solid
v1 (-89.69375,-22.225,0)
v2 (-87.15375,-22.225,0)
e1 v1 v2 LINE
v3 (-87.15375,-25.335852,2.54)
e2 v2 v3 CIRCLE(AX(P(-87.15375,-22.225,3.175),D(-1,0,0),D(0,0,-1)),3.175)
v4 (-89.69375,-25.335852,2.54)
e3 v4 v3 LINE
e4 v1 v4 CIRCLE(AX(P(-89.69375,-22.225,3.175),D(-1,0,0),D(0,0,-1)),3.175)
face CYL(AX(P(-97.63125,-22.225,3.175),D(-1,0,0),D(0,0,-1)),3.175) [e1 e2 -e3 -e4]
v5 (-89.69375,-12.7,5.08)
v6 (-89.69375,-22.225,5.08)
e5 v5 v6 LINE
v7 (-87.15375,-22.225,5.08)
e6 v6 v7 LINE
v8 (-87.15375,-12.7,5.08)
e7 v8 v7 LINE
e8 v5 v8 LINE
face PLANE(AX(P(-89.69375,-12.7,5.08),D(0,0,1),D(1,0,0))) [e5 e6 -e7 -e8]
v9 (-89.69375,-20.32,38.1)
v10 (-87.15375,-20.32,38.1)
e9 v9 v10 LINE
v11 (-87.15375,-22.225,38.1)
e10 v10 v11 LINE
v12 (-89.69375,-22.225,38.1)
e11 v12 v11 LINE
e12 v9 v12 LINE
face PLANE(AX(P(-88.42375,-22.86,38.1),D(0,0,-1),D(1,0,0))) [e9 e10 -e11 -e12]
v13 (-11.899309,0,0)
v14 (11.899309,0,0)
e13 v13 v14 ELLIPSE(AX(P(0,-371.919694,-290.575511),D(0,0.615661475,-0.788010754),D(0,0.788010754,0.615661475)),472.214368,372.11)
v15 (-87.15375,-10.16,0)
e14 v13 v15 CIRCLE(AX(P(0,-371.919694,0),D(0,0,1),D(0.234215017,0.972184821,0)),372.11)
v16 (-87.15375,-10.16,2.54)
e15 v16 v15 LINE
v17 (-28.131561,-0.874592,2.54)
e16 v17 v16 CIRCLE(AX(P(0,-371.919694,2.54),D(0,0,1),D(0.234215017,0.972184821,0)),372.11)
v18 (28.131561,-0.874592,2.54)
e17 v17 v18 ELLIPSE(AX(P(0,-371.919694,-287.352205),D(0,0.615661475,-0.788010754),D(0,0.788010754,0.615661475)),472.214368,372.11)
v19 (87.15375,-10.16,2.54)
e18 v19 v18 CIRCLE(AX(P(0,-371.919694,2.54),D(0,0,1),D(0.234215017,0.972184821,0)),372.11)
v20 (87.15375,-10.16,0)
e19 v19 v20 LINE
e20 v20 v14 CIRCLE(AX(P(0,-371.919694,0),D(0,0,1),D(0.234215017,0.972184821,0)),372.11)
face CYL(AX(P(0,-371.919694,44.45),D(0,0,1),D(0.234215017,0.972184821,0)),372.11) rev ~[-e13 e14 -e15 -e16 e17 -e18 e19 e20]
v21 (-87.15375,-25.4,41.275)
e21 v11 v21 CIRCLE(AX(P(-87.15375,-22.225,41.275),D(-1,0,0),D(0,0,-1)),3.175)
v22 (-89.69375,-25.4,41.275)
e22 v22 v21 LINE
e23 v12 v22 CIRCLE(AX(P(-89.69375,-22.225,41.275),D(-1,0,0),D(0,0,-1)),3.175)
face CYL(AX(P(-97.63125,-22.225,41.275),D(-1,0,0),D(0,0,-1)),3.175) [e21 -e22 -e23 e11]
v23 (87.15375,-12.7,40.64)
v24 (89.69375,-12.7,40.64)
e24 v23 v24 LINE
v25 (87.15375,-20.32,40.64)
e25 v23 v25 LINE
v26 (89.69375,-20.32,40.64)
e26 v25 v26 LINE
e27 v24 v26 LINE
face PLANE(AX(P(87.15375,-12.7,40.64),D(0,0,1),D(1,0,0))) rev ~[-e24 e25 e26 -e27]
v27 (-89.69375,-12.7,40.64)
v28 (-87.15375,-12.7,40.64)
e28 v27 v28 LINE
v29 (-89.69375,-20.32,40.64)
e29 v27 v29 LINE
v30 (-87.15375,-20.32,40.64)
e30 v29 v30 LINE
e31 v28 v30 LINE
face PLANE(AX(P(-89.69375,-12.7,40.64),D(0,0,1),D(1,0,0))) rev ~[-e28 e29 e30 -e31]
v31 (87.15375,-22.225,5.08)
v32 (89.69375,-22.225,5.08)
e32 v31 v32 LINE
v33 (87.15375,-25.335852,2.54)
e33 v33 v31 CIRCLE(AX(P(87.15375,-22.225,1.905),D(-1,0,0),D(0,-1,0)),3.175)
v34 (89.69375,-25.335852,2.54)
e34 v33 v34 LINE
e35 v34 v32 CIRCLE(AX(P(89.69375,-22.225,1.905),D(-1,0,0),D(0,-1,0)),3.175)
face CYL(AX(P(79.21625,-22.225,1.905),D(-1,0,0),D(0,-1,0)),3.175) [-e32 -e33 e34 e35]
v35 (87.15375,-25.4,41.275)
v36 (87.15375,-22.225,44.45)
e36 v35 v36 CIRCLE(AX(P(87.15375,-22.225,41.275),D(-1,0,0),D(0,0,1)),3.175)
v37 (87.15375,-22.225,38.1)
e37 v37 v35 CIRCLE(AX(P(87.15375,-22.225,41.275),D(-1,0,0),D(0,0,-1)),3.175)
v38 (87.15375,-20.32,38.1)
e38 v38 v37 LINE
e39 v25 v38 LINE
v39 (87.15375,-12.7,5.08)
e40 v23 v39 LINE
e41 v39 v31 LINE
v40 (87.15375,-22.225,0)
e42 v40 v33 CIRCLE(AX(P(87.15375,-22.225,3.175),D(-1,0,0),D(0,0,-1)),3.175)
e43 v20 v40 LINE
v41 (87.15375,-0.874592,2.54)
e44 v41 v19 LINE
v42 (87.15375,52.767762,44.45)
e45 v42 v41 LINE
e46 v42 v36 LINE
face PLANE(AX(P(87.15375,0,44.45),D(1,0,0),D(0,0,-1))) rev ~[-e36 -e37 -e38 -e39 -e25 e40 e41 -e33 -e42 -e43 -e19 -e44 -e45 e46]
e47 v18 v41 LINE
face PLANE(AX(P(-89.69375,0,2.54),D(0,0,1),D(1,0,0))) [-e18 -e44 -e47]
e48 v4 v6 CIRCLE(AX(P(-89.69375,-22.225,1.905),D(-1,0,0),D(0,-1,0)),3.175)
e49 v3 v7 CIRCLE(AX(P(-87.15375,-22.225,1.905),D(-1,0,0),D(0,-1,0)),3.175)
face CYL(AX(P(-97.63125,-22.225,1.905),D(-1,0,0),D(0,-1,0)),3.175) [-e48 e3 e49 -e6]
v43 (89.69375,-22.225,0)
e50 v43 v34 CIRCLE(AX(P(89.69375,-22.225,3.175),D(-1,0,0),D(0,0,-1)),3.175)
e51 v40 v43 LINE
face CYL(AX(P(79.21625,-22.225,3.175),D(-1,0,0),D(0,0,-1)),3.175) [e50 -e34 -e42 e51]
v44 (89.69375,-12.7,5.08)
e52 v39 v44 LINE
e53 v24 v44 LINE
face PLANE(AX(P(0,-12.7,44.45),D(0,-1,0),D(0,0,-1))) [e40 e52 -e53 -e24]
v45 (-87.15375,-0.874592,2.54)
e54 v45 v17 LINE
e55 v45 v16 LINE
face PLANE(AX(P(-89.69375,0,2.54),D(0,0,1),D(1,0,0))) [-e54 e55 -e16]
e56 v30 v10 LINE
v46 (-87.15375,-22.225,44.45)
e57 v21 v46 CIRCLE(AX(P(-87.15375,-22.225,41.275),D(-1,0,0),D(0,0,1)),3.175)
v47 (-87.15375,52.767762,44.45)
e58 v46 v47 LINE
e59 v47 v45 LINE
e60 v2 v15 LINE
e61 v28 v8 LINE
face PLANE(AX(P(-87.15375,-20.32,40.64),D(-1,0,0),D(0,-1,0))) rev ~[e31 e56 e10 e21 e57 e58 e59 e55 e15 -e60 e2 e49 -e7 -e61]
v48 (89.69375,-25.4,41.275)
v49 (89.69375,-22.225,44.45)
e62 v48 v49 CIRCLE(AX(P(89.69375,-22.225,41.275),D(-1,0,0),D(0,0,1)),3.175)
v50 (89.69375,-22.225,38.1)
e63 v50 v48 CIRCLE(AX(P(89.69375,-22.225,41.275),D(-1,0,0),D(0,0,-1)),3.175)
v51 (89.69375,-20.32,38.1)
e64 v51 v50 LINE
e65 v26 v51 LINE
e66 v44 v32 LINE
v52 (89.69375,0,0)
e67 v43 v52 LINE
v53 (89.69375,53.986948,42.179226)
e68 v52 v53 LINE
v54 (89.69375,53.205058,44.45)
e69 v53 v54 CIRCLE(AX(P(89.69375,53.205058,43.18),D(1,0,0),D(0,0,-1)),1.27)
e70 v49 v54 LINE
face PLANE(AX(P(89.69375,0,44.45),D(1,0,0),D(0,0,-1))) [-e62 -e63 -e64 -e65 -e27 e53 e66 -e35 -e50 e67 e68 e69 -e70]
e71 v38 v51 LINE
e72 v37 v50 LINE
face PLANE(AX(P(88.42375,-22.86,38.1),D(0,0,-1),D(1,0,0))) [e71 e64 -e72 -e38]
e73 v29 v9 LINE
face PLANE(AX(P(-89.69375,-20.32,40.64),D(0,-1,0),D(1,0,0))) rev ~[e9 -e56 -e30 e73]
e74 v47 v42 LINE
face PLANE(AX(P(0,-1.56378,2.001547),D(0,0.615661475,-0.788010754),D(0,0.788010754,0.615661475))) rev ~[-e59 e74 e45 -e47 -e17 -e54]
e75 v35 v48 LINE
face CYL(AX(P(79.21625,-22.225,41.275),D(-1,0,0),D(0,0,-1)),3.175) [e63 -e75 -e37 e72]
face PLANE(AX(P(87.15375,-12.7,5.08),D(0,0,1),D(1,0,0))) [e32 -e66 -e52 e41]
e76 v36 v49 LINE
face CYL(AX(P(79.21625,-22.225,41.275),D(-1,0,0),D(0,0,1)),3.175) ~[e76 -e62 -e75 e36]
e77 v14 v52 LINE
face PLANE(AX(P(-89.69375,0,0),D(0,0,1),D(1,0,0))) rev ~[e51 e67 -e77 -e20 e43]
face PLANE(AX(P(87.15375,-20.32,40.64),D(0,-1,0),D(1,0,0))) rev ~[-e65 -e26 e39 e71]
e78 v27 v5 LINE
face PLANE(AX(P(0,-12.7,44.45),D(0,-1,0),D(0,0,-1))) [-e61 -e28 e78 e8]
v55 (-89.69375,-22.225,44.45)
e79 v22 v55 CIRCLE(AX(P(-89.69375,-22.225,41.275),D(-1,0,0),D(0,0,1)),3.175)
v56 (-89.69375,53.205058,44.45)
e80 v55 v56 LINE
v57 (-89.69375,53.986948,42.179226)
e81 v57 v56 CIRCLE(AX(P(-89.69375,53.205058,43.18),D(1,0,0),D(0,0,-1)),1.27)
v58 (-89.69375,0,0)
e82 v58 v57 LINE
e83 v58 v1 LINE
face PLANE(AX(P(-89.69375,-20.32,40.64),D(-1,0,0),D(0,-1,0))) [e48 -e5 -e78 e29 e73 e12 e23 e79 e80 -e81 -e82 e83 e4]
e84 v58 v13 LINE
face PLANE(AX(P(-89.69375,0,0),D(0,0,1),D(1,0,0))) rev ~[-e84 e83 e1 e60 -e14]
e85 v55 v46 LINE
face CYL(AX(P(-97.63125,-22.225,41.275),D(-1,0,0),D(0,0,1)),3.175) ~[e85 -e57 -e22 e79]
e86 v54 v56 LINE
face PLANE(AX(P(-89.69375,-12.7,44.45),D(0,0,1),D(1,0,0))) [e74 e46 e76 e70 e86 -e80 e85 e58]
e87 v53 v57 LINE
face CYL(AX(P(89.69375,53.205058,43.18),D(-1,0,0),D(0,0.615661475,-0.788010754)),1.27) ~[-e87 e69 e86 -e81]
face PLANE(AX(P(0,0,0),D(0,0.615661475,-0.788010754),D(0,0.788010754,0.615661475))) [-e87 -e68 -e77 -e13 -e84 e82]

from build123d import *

# Parameters (mm, degrees)
F1_DEPTH     = 89.69375
F2_DEPTH     = 12.7
F4_DEPTH     = 44.451
F5_T         = 2.54
F6_R         = 1.27
F7_W         = 2.54
F7_H         = 3.81
F7_H_2       = 5.08
F8_W         = 2.54
F8_H         = 3.81
F8_H_2       = 5.08
F9_DEPTH     = 12.7
F11_W        = 2.54
F11_H        = 5.08
F10_W        = 2.54
F10_H        = 5.08
F12_DEPTH    = 2.54
F13_T1_DEPTH = 18.415
F13_T3_DEPTH = 18.415


# Not quite as in the source:
# - a fillet or chamfer that OpenCascade refuses, or shapes differently, is made with other operations: its cross-section is extruded or revolved along the edge and cut away or added
# - a shell that OpenCascade refuses in one call is made with other operations: the cavity is built on its own and cut out
# - a feature names something its author has since deleted; it is built from what else it names


with BuildPart() as f1:
    # F0 (on Right) → F1 (new body, symmetric)
    with BuildSketch(Plane.YZ):
        Polygon((0, 44.45), (0, 0), (56.893405551, 44.45), align=None)
    extrude(amount=F1_DEPTH, both=True)

    # F2 (add): a face of the model
    f2_faces = [f1.faces().sort_by_distance(p)[0] for p in [
        (0, 0, 22.225),
    ]]
    extrude(f2_faces, amount=F2_DEPTH)

    # F3 (on face) → F4 (cut, through all)
    with BuildSketch(Plane.XY.offset(44.45)):
        with BuildLine():
            Line((-87.15375, -10.16), (-87.15375, -12.7))
            Line((-87.15375, -12.7), (87.15375, -12.7))
            Line((87.15375, -12.7), (87.15375, -10.16))
            ThreePointArc((87.15375, -10.16), (0, 0.1903063345), (-87.15375, -10.16))
        make_face()
    extrude(amount=-F4_DEPTH, mode=Mode.SUBTRACT)

    # F5: shell of thickness 2.54, made by hand


with BuildPart() as f5_core1:
    # F5_t2: copy of F1
    add(f1.part)

    # the walls: a layer under each face that stays
    f5_faces = [f5_core1.faces().sort_by_distance(p)[0] for p in [
        (0, 28.4467027755, 22.225),
        (89.69375, 22.0967027755, 22.225),
        (88.42375, -12.7, 22.225),
        (87.15375, -11.43, 22.225),
        (-87.15375, -11.43, 22.225),
        (-88.42375, -12.7, 22.225),
        (-89.69375, 22.0967027755, 22.225),
        (-76.7280098971, -6.35, 0),
        (50.7965296912, -2.1166666667, 0),
    ]]
    thicken(f5_faces, amount=-F5_T, mode=Mode.SUBTRACT)


with BuildPart() as f1_1:
    add(f1.part)

    # what is left inside the walls is the cavity
    f5_cavity = [f5_core1.part.solids().sort_by_distance(p)[0] for p in [
        (-29.05125, 25.930947, 23.515015),
    ]]
    add(f5_cavity, mode=Mode.SUBTRACT)

    # F6
    f6_edges = [f1_1.edges().sort_by_distance(p)[0] for p in [
        (0, 56.893406, 44.45),
    ]]
    fillet(f6_edges, radius=F6_R)

    # F7 (on face) + F8 (on face) → F9 (join)
    with BuildSketch(Plane.XZ.offset(12.7)):
        with Locations((-88.42375, 42.545)):
            Rectangle(F7_W, F7_H)
        with Locations((-88.42375, 2.54)):
            Rectangle(F7_W, F7_H_2)
    with BuildSketch(Plane.XZ.offset(12.7)):
        with Locations((88.42375, 42.545)):
            Rectangle(F8_W, F8_H)
        with Locations((88.42375, 2.54)):
            Rectangle(F8_W, F8_H_2)
    extrude(amount=F9_DEPTH)

    # F11 (on face) + F10 (on face) → F12 (join)
    with BuildSketch(Plane(origin=(0, 0, 40.64), x_dir=(1, 0, 0), z_dir=(0, 0, -1))):
        with Locations((-88.42375, 22.86)):
            Rectangle(F11_W, F11_H)
    with BuildSketch(Plane(origin=(0, 0, 40.64), x_dir=(1, 0, 0), z_dir=(0, 0, -1))):
        with Locations((88.42375, 22.86)):
            Rectangle(F10_W, F10_H)
    extrude(amount=F12_DEPTH)

    # F13: fillet of radius 3.175 on 8 edges, made by hand

    # F13_s2 → F13_t1 (cut)
    with BuildSketch(Plane.YZ.offset(79.21625)):
        with BuildLine():
            ThreePointArc((-22.225, 44.45), (-24.4700640303, 43.5200640303), (-25.4, 41.275))
            Line((-25.4, 41.275), (-25.4, 44.45))
            Line((-25.4, 44.45), (-22.225, 44.45))
        make_face()
        with BuildLine():
            ThreePointArc((-22.225, 38.1), (-24.4700640303, 39.0299359697), (-25.4, 41.275))
            Line((-25.4, 41.275), (-25.4, 38.1))
            Line((-25.4, 38.1), (-22.225, 38.1))
        make_face()
        with BuildLine():
            ThreePointArc((-25.4, 1.905), (-24.4700640303, 4.1500640303), (-22.225, 5.08))
            Line((-22.225, 5.08), (-25.4, 5.08))
            Line((-25.4, 5.08), (-25.4, 1.905))
        make_face()
        with BuildLine():
            ThreePointArc((-22.225, 0), (-24.4700640303, 0.9299359697), (-25.4, 3.175))
            Line((-25.4, 3.175), (-25.4, 0))
            Line((-25.4, 0), (-22.225, 0))
        make_face()
    extrude(amount=F13_T1_DEPTH, mode=Mode.SUBTRACT)

    # F13_s4 → F13_t3 (cut)
    with BuildSketch(Plane.YZ.offset(-97.63125)):
        with BuildLine():
            ThreePointArc((-22.225, 44.45), (-24.4700640303, 43.5200640303), (-25.4, 41.275))
            Line((-25.4, 41.275), (-25.4, 44.45))
            Line((-25.4, 44.45), (-22.225, 44.45))
        make_face()
        with BuildLine():
            ThreePointArc((-22.225, 38.1), (-24.4700640303, 39.0299359697), (-25.4, 41.275))
            Line((-25.4, 41.275), (-25.4, 38.1))
            Line((-25.4, 38.1), (-22.225, 38.1))
        make_face()
        with BuildLine():
            ThreePointArc((-25.4, 1.905), (-24.4700640303, 4.1500640303), (-22.225, 5.08))
            Line((-22.225, 5.08), (-25.4, 5.08))
            Line((-25.4, 5.08), (-25.4, 1.905))
        make_face()
        with BuildLine():
            ThreePointArc((-22.225, 0), (-24.4700640303, 0.9299359697), (-25.4, 3.175))
            Line((-25.4, 3.175), (-25.4, 0))
            Line((-25.4, 0), (-22.225, 0))
        make_face()
    extrude(amount=F13_T3_DEPTH, mode=Mode.SUBTRACT)


solid = f1_1.part
